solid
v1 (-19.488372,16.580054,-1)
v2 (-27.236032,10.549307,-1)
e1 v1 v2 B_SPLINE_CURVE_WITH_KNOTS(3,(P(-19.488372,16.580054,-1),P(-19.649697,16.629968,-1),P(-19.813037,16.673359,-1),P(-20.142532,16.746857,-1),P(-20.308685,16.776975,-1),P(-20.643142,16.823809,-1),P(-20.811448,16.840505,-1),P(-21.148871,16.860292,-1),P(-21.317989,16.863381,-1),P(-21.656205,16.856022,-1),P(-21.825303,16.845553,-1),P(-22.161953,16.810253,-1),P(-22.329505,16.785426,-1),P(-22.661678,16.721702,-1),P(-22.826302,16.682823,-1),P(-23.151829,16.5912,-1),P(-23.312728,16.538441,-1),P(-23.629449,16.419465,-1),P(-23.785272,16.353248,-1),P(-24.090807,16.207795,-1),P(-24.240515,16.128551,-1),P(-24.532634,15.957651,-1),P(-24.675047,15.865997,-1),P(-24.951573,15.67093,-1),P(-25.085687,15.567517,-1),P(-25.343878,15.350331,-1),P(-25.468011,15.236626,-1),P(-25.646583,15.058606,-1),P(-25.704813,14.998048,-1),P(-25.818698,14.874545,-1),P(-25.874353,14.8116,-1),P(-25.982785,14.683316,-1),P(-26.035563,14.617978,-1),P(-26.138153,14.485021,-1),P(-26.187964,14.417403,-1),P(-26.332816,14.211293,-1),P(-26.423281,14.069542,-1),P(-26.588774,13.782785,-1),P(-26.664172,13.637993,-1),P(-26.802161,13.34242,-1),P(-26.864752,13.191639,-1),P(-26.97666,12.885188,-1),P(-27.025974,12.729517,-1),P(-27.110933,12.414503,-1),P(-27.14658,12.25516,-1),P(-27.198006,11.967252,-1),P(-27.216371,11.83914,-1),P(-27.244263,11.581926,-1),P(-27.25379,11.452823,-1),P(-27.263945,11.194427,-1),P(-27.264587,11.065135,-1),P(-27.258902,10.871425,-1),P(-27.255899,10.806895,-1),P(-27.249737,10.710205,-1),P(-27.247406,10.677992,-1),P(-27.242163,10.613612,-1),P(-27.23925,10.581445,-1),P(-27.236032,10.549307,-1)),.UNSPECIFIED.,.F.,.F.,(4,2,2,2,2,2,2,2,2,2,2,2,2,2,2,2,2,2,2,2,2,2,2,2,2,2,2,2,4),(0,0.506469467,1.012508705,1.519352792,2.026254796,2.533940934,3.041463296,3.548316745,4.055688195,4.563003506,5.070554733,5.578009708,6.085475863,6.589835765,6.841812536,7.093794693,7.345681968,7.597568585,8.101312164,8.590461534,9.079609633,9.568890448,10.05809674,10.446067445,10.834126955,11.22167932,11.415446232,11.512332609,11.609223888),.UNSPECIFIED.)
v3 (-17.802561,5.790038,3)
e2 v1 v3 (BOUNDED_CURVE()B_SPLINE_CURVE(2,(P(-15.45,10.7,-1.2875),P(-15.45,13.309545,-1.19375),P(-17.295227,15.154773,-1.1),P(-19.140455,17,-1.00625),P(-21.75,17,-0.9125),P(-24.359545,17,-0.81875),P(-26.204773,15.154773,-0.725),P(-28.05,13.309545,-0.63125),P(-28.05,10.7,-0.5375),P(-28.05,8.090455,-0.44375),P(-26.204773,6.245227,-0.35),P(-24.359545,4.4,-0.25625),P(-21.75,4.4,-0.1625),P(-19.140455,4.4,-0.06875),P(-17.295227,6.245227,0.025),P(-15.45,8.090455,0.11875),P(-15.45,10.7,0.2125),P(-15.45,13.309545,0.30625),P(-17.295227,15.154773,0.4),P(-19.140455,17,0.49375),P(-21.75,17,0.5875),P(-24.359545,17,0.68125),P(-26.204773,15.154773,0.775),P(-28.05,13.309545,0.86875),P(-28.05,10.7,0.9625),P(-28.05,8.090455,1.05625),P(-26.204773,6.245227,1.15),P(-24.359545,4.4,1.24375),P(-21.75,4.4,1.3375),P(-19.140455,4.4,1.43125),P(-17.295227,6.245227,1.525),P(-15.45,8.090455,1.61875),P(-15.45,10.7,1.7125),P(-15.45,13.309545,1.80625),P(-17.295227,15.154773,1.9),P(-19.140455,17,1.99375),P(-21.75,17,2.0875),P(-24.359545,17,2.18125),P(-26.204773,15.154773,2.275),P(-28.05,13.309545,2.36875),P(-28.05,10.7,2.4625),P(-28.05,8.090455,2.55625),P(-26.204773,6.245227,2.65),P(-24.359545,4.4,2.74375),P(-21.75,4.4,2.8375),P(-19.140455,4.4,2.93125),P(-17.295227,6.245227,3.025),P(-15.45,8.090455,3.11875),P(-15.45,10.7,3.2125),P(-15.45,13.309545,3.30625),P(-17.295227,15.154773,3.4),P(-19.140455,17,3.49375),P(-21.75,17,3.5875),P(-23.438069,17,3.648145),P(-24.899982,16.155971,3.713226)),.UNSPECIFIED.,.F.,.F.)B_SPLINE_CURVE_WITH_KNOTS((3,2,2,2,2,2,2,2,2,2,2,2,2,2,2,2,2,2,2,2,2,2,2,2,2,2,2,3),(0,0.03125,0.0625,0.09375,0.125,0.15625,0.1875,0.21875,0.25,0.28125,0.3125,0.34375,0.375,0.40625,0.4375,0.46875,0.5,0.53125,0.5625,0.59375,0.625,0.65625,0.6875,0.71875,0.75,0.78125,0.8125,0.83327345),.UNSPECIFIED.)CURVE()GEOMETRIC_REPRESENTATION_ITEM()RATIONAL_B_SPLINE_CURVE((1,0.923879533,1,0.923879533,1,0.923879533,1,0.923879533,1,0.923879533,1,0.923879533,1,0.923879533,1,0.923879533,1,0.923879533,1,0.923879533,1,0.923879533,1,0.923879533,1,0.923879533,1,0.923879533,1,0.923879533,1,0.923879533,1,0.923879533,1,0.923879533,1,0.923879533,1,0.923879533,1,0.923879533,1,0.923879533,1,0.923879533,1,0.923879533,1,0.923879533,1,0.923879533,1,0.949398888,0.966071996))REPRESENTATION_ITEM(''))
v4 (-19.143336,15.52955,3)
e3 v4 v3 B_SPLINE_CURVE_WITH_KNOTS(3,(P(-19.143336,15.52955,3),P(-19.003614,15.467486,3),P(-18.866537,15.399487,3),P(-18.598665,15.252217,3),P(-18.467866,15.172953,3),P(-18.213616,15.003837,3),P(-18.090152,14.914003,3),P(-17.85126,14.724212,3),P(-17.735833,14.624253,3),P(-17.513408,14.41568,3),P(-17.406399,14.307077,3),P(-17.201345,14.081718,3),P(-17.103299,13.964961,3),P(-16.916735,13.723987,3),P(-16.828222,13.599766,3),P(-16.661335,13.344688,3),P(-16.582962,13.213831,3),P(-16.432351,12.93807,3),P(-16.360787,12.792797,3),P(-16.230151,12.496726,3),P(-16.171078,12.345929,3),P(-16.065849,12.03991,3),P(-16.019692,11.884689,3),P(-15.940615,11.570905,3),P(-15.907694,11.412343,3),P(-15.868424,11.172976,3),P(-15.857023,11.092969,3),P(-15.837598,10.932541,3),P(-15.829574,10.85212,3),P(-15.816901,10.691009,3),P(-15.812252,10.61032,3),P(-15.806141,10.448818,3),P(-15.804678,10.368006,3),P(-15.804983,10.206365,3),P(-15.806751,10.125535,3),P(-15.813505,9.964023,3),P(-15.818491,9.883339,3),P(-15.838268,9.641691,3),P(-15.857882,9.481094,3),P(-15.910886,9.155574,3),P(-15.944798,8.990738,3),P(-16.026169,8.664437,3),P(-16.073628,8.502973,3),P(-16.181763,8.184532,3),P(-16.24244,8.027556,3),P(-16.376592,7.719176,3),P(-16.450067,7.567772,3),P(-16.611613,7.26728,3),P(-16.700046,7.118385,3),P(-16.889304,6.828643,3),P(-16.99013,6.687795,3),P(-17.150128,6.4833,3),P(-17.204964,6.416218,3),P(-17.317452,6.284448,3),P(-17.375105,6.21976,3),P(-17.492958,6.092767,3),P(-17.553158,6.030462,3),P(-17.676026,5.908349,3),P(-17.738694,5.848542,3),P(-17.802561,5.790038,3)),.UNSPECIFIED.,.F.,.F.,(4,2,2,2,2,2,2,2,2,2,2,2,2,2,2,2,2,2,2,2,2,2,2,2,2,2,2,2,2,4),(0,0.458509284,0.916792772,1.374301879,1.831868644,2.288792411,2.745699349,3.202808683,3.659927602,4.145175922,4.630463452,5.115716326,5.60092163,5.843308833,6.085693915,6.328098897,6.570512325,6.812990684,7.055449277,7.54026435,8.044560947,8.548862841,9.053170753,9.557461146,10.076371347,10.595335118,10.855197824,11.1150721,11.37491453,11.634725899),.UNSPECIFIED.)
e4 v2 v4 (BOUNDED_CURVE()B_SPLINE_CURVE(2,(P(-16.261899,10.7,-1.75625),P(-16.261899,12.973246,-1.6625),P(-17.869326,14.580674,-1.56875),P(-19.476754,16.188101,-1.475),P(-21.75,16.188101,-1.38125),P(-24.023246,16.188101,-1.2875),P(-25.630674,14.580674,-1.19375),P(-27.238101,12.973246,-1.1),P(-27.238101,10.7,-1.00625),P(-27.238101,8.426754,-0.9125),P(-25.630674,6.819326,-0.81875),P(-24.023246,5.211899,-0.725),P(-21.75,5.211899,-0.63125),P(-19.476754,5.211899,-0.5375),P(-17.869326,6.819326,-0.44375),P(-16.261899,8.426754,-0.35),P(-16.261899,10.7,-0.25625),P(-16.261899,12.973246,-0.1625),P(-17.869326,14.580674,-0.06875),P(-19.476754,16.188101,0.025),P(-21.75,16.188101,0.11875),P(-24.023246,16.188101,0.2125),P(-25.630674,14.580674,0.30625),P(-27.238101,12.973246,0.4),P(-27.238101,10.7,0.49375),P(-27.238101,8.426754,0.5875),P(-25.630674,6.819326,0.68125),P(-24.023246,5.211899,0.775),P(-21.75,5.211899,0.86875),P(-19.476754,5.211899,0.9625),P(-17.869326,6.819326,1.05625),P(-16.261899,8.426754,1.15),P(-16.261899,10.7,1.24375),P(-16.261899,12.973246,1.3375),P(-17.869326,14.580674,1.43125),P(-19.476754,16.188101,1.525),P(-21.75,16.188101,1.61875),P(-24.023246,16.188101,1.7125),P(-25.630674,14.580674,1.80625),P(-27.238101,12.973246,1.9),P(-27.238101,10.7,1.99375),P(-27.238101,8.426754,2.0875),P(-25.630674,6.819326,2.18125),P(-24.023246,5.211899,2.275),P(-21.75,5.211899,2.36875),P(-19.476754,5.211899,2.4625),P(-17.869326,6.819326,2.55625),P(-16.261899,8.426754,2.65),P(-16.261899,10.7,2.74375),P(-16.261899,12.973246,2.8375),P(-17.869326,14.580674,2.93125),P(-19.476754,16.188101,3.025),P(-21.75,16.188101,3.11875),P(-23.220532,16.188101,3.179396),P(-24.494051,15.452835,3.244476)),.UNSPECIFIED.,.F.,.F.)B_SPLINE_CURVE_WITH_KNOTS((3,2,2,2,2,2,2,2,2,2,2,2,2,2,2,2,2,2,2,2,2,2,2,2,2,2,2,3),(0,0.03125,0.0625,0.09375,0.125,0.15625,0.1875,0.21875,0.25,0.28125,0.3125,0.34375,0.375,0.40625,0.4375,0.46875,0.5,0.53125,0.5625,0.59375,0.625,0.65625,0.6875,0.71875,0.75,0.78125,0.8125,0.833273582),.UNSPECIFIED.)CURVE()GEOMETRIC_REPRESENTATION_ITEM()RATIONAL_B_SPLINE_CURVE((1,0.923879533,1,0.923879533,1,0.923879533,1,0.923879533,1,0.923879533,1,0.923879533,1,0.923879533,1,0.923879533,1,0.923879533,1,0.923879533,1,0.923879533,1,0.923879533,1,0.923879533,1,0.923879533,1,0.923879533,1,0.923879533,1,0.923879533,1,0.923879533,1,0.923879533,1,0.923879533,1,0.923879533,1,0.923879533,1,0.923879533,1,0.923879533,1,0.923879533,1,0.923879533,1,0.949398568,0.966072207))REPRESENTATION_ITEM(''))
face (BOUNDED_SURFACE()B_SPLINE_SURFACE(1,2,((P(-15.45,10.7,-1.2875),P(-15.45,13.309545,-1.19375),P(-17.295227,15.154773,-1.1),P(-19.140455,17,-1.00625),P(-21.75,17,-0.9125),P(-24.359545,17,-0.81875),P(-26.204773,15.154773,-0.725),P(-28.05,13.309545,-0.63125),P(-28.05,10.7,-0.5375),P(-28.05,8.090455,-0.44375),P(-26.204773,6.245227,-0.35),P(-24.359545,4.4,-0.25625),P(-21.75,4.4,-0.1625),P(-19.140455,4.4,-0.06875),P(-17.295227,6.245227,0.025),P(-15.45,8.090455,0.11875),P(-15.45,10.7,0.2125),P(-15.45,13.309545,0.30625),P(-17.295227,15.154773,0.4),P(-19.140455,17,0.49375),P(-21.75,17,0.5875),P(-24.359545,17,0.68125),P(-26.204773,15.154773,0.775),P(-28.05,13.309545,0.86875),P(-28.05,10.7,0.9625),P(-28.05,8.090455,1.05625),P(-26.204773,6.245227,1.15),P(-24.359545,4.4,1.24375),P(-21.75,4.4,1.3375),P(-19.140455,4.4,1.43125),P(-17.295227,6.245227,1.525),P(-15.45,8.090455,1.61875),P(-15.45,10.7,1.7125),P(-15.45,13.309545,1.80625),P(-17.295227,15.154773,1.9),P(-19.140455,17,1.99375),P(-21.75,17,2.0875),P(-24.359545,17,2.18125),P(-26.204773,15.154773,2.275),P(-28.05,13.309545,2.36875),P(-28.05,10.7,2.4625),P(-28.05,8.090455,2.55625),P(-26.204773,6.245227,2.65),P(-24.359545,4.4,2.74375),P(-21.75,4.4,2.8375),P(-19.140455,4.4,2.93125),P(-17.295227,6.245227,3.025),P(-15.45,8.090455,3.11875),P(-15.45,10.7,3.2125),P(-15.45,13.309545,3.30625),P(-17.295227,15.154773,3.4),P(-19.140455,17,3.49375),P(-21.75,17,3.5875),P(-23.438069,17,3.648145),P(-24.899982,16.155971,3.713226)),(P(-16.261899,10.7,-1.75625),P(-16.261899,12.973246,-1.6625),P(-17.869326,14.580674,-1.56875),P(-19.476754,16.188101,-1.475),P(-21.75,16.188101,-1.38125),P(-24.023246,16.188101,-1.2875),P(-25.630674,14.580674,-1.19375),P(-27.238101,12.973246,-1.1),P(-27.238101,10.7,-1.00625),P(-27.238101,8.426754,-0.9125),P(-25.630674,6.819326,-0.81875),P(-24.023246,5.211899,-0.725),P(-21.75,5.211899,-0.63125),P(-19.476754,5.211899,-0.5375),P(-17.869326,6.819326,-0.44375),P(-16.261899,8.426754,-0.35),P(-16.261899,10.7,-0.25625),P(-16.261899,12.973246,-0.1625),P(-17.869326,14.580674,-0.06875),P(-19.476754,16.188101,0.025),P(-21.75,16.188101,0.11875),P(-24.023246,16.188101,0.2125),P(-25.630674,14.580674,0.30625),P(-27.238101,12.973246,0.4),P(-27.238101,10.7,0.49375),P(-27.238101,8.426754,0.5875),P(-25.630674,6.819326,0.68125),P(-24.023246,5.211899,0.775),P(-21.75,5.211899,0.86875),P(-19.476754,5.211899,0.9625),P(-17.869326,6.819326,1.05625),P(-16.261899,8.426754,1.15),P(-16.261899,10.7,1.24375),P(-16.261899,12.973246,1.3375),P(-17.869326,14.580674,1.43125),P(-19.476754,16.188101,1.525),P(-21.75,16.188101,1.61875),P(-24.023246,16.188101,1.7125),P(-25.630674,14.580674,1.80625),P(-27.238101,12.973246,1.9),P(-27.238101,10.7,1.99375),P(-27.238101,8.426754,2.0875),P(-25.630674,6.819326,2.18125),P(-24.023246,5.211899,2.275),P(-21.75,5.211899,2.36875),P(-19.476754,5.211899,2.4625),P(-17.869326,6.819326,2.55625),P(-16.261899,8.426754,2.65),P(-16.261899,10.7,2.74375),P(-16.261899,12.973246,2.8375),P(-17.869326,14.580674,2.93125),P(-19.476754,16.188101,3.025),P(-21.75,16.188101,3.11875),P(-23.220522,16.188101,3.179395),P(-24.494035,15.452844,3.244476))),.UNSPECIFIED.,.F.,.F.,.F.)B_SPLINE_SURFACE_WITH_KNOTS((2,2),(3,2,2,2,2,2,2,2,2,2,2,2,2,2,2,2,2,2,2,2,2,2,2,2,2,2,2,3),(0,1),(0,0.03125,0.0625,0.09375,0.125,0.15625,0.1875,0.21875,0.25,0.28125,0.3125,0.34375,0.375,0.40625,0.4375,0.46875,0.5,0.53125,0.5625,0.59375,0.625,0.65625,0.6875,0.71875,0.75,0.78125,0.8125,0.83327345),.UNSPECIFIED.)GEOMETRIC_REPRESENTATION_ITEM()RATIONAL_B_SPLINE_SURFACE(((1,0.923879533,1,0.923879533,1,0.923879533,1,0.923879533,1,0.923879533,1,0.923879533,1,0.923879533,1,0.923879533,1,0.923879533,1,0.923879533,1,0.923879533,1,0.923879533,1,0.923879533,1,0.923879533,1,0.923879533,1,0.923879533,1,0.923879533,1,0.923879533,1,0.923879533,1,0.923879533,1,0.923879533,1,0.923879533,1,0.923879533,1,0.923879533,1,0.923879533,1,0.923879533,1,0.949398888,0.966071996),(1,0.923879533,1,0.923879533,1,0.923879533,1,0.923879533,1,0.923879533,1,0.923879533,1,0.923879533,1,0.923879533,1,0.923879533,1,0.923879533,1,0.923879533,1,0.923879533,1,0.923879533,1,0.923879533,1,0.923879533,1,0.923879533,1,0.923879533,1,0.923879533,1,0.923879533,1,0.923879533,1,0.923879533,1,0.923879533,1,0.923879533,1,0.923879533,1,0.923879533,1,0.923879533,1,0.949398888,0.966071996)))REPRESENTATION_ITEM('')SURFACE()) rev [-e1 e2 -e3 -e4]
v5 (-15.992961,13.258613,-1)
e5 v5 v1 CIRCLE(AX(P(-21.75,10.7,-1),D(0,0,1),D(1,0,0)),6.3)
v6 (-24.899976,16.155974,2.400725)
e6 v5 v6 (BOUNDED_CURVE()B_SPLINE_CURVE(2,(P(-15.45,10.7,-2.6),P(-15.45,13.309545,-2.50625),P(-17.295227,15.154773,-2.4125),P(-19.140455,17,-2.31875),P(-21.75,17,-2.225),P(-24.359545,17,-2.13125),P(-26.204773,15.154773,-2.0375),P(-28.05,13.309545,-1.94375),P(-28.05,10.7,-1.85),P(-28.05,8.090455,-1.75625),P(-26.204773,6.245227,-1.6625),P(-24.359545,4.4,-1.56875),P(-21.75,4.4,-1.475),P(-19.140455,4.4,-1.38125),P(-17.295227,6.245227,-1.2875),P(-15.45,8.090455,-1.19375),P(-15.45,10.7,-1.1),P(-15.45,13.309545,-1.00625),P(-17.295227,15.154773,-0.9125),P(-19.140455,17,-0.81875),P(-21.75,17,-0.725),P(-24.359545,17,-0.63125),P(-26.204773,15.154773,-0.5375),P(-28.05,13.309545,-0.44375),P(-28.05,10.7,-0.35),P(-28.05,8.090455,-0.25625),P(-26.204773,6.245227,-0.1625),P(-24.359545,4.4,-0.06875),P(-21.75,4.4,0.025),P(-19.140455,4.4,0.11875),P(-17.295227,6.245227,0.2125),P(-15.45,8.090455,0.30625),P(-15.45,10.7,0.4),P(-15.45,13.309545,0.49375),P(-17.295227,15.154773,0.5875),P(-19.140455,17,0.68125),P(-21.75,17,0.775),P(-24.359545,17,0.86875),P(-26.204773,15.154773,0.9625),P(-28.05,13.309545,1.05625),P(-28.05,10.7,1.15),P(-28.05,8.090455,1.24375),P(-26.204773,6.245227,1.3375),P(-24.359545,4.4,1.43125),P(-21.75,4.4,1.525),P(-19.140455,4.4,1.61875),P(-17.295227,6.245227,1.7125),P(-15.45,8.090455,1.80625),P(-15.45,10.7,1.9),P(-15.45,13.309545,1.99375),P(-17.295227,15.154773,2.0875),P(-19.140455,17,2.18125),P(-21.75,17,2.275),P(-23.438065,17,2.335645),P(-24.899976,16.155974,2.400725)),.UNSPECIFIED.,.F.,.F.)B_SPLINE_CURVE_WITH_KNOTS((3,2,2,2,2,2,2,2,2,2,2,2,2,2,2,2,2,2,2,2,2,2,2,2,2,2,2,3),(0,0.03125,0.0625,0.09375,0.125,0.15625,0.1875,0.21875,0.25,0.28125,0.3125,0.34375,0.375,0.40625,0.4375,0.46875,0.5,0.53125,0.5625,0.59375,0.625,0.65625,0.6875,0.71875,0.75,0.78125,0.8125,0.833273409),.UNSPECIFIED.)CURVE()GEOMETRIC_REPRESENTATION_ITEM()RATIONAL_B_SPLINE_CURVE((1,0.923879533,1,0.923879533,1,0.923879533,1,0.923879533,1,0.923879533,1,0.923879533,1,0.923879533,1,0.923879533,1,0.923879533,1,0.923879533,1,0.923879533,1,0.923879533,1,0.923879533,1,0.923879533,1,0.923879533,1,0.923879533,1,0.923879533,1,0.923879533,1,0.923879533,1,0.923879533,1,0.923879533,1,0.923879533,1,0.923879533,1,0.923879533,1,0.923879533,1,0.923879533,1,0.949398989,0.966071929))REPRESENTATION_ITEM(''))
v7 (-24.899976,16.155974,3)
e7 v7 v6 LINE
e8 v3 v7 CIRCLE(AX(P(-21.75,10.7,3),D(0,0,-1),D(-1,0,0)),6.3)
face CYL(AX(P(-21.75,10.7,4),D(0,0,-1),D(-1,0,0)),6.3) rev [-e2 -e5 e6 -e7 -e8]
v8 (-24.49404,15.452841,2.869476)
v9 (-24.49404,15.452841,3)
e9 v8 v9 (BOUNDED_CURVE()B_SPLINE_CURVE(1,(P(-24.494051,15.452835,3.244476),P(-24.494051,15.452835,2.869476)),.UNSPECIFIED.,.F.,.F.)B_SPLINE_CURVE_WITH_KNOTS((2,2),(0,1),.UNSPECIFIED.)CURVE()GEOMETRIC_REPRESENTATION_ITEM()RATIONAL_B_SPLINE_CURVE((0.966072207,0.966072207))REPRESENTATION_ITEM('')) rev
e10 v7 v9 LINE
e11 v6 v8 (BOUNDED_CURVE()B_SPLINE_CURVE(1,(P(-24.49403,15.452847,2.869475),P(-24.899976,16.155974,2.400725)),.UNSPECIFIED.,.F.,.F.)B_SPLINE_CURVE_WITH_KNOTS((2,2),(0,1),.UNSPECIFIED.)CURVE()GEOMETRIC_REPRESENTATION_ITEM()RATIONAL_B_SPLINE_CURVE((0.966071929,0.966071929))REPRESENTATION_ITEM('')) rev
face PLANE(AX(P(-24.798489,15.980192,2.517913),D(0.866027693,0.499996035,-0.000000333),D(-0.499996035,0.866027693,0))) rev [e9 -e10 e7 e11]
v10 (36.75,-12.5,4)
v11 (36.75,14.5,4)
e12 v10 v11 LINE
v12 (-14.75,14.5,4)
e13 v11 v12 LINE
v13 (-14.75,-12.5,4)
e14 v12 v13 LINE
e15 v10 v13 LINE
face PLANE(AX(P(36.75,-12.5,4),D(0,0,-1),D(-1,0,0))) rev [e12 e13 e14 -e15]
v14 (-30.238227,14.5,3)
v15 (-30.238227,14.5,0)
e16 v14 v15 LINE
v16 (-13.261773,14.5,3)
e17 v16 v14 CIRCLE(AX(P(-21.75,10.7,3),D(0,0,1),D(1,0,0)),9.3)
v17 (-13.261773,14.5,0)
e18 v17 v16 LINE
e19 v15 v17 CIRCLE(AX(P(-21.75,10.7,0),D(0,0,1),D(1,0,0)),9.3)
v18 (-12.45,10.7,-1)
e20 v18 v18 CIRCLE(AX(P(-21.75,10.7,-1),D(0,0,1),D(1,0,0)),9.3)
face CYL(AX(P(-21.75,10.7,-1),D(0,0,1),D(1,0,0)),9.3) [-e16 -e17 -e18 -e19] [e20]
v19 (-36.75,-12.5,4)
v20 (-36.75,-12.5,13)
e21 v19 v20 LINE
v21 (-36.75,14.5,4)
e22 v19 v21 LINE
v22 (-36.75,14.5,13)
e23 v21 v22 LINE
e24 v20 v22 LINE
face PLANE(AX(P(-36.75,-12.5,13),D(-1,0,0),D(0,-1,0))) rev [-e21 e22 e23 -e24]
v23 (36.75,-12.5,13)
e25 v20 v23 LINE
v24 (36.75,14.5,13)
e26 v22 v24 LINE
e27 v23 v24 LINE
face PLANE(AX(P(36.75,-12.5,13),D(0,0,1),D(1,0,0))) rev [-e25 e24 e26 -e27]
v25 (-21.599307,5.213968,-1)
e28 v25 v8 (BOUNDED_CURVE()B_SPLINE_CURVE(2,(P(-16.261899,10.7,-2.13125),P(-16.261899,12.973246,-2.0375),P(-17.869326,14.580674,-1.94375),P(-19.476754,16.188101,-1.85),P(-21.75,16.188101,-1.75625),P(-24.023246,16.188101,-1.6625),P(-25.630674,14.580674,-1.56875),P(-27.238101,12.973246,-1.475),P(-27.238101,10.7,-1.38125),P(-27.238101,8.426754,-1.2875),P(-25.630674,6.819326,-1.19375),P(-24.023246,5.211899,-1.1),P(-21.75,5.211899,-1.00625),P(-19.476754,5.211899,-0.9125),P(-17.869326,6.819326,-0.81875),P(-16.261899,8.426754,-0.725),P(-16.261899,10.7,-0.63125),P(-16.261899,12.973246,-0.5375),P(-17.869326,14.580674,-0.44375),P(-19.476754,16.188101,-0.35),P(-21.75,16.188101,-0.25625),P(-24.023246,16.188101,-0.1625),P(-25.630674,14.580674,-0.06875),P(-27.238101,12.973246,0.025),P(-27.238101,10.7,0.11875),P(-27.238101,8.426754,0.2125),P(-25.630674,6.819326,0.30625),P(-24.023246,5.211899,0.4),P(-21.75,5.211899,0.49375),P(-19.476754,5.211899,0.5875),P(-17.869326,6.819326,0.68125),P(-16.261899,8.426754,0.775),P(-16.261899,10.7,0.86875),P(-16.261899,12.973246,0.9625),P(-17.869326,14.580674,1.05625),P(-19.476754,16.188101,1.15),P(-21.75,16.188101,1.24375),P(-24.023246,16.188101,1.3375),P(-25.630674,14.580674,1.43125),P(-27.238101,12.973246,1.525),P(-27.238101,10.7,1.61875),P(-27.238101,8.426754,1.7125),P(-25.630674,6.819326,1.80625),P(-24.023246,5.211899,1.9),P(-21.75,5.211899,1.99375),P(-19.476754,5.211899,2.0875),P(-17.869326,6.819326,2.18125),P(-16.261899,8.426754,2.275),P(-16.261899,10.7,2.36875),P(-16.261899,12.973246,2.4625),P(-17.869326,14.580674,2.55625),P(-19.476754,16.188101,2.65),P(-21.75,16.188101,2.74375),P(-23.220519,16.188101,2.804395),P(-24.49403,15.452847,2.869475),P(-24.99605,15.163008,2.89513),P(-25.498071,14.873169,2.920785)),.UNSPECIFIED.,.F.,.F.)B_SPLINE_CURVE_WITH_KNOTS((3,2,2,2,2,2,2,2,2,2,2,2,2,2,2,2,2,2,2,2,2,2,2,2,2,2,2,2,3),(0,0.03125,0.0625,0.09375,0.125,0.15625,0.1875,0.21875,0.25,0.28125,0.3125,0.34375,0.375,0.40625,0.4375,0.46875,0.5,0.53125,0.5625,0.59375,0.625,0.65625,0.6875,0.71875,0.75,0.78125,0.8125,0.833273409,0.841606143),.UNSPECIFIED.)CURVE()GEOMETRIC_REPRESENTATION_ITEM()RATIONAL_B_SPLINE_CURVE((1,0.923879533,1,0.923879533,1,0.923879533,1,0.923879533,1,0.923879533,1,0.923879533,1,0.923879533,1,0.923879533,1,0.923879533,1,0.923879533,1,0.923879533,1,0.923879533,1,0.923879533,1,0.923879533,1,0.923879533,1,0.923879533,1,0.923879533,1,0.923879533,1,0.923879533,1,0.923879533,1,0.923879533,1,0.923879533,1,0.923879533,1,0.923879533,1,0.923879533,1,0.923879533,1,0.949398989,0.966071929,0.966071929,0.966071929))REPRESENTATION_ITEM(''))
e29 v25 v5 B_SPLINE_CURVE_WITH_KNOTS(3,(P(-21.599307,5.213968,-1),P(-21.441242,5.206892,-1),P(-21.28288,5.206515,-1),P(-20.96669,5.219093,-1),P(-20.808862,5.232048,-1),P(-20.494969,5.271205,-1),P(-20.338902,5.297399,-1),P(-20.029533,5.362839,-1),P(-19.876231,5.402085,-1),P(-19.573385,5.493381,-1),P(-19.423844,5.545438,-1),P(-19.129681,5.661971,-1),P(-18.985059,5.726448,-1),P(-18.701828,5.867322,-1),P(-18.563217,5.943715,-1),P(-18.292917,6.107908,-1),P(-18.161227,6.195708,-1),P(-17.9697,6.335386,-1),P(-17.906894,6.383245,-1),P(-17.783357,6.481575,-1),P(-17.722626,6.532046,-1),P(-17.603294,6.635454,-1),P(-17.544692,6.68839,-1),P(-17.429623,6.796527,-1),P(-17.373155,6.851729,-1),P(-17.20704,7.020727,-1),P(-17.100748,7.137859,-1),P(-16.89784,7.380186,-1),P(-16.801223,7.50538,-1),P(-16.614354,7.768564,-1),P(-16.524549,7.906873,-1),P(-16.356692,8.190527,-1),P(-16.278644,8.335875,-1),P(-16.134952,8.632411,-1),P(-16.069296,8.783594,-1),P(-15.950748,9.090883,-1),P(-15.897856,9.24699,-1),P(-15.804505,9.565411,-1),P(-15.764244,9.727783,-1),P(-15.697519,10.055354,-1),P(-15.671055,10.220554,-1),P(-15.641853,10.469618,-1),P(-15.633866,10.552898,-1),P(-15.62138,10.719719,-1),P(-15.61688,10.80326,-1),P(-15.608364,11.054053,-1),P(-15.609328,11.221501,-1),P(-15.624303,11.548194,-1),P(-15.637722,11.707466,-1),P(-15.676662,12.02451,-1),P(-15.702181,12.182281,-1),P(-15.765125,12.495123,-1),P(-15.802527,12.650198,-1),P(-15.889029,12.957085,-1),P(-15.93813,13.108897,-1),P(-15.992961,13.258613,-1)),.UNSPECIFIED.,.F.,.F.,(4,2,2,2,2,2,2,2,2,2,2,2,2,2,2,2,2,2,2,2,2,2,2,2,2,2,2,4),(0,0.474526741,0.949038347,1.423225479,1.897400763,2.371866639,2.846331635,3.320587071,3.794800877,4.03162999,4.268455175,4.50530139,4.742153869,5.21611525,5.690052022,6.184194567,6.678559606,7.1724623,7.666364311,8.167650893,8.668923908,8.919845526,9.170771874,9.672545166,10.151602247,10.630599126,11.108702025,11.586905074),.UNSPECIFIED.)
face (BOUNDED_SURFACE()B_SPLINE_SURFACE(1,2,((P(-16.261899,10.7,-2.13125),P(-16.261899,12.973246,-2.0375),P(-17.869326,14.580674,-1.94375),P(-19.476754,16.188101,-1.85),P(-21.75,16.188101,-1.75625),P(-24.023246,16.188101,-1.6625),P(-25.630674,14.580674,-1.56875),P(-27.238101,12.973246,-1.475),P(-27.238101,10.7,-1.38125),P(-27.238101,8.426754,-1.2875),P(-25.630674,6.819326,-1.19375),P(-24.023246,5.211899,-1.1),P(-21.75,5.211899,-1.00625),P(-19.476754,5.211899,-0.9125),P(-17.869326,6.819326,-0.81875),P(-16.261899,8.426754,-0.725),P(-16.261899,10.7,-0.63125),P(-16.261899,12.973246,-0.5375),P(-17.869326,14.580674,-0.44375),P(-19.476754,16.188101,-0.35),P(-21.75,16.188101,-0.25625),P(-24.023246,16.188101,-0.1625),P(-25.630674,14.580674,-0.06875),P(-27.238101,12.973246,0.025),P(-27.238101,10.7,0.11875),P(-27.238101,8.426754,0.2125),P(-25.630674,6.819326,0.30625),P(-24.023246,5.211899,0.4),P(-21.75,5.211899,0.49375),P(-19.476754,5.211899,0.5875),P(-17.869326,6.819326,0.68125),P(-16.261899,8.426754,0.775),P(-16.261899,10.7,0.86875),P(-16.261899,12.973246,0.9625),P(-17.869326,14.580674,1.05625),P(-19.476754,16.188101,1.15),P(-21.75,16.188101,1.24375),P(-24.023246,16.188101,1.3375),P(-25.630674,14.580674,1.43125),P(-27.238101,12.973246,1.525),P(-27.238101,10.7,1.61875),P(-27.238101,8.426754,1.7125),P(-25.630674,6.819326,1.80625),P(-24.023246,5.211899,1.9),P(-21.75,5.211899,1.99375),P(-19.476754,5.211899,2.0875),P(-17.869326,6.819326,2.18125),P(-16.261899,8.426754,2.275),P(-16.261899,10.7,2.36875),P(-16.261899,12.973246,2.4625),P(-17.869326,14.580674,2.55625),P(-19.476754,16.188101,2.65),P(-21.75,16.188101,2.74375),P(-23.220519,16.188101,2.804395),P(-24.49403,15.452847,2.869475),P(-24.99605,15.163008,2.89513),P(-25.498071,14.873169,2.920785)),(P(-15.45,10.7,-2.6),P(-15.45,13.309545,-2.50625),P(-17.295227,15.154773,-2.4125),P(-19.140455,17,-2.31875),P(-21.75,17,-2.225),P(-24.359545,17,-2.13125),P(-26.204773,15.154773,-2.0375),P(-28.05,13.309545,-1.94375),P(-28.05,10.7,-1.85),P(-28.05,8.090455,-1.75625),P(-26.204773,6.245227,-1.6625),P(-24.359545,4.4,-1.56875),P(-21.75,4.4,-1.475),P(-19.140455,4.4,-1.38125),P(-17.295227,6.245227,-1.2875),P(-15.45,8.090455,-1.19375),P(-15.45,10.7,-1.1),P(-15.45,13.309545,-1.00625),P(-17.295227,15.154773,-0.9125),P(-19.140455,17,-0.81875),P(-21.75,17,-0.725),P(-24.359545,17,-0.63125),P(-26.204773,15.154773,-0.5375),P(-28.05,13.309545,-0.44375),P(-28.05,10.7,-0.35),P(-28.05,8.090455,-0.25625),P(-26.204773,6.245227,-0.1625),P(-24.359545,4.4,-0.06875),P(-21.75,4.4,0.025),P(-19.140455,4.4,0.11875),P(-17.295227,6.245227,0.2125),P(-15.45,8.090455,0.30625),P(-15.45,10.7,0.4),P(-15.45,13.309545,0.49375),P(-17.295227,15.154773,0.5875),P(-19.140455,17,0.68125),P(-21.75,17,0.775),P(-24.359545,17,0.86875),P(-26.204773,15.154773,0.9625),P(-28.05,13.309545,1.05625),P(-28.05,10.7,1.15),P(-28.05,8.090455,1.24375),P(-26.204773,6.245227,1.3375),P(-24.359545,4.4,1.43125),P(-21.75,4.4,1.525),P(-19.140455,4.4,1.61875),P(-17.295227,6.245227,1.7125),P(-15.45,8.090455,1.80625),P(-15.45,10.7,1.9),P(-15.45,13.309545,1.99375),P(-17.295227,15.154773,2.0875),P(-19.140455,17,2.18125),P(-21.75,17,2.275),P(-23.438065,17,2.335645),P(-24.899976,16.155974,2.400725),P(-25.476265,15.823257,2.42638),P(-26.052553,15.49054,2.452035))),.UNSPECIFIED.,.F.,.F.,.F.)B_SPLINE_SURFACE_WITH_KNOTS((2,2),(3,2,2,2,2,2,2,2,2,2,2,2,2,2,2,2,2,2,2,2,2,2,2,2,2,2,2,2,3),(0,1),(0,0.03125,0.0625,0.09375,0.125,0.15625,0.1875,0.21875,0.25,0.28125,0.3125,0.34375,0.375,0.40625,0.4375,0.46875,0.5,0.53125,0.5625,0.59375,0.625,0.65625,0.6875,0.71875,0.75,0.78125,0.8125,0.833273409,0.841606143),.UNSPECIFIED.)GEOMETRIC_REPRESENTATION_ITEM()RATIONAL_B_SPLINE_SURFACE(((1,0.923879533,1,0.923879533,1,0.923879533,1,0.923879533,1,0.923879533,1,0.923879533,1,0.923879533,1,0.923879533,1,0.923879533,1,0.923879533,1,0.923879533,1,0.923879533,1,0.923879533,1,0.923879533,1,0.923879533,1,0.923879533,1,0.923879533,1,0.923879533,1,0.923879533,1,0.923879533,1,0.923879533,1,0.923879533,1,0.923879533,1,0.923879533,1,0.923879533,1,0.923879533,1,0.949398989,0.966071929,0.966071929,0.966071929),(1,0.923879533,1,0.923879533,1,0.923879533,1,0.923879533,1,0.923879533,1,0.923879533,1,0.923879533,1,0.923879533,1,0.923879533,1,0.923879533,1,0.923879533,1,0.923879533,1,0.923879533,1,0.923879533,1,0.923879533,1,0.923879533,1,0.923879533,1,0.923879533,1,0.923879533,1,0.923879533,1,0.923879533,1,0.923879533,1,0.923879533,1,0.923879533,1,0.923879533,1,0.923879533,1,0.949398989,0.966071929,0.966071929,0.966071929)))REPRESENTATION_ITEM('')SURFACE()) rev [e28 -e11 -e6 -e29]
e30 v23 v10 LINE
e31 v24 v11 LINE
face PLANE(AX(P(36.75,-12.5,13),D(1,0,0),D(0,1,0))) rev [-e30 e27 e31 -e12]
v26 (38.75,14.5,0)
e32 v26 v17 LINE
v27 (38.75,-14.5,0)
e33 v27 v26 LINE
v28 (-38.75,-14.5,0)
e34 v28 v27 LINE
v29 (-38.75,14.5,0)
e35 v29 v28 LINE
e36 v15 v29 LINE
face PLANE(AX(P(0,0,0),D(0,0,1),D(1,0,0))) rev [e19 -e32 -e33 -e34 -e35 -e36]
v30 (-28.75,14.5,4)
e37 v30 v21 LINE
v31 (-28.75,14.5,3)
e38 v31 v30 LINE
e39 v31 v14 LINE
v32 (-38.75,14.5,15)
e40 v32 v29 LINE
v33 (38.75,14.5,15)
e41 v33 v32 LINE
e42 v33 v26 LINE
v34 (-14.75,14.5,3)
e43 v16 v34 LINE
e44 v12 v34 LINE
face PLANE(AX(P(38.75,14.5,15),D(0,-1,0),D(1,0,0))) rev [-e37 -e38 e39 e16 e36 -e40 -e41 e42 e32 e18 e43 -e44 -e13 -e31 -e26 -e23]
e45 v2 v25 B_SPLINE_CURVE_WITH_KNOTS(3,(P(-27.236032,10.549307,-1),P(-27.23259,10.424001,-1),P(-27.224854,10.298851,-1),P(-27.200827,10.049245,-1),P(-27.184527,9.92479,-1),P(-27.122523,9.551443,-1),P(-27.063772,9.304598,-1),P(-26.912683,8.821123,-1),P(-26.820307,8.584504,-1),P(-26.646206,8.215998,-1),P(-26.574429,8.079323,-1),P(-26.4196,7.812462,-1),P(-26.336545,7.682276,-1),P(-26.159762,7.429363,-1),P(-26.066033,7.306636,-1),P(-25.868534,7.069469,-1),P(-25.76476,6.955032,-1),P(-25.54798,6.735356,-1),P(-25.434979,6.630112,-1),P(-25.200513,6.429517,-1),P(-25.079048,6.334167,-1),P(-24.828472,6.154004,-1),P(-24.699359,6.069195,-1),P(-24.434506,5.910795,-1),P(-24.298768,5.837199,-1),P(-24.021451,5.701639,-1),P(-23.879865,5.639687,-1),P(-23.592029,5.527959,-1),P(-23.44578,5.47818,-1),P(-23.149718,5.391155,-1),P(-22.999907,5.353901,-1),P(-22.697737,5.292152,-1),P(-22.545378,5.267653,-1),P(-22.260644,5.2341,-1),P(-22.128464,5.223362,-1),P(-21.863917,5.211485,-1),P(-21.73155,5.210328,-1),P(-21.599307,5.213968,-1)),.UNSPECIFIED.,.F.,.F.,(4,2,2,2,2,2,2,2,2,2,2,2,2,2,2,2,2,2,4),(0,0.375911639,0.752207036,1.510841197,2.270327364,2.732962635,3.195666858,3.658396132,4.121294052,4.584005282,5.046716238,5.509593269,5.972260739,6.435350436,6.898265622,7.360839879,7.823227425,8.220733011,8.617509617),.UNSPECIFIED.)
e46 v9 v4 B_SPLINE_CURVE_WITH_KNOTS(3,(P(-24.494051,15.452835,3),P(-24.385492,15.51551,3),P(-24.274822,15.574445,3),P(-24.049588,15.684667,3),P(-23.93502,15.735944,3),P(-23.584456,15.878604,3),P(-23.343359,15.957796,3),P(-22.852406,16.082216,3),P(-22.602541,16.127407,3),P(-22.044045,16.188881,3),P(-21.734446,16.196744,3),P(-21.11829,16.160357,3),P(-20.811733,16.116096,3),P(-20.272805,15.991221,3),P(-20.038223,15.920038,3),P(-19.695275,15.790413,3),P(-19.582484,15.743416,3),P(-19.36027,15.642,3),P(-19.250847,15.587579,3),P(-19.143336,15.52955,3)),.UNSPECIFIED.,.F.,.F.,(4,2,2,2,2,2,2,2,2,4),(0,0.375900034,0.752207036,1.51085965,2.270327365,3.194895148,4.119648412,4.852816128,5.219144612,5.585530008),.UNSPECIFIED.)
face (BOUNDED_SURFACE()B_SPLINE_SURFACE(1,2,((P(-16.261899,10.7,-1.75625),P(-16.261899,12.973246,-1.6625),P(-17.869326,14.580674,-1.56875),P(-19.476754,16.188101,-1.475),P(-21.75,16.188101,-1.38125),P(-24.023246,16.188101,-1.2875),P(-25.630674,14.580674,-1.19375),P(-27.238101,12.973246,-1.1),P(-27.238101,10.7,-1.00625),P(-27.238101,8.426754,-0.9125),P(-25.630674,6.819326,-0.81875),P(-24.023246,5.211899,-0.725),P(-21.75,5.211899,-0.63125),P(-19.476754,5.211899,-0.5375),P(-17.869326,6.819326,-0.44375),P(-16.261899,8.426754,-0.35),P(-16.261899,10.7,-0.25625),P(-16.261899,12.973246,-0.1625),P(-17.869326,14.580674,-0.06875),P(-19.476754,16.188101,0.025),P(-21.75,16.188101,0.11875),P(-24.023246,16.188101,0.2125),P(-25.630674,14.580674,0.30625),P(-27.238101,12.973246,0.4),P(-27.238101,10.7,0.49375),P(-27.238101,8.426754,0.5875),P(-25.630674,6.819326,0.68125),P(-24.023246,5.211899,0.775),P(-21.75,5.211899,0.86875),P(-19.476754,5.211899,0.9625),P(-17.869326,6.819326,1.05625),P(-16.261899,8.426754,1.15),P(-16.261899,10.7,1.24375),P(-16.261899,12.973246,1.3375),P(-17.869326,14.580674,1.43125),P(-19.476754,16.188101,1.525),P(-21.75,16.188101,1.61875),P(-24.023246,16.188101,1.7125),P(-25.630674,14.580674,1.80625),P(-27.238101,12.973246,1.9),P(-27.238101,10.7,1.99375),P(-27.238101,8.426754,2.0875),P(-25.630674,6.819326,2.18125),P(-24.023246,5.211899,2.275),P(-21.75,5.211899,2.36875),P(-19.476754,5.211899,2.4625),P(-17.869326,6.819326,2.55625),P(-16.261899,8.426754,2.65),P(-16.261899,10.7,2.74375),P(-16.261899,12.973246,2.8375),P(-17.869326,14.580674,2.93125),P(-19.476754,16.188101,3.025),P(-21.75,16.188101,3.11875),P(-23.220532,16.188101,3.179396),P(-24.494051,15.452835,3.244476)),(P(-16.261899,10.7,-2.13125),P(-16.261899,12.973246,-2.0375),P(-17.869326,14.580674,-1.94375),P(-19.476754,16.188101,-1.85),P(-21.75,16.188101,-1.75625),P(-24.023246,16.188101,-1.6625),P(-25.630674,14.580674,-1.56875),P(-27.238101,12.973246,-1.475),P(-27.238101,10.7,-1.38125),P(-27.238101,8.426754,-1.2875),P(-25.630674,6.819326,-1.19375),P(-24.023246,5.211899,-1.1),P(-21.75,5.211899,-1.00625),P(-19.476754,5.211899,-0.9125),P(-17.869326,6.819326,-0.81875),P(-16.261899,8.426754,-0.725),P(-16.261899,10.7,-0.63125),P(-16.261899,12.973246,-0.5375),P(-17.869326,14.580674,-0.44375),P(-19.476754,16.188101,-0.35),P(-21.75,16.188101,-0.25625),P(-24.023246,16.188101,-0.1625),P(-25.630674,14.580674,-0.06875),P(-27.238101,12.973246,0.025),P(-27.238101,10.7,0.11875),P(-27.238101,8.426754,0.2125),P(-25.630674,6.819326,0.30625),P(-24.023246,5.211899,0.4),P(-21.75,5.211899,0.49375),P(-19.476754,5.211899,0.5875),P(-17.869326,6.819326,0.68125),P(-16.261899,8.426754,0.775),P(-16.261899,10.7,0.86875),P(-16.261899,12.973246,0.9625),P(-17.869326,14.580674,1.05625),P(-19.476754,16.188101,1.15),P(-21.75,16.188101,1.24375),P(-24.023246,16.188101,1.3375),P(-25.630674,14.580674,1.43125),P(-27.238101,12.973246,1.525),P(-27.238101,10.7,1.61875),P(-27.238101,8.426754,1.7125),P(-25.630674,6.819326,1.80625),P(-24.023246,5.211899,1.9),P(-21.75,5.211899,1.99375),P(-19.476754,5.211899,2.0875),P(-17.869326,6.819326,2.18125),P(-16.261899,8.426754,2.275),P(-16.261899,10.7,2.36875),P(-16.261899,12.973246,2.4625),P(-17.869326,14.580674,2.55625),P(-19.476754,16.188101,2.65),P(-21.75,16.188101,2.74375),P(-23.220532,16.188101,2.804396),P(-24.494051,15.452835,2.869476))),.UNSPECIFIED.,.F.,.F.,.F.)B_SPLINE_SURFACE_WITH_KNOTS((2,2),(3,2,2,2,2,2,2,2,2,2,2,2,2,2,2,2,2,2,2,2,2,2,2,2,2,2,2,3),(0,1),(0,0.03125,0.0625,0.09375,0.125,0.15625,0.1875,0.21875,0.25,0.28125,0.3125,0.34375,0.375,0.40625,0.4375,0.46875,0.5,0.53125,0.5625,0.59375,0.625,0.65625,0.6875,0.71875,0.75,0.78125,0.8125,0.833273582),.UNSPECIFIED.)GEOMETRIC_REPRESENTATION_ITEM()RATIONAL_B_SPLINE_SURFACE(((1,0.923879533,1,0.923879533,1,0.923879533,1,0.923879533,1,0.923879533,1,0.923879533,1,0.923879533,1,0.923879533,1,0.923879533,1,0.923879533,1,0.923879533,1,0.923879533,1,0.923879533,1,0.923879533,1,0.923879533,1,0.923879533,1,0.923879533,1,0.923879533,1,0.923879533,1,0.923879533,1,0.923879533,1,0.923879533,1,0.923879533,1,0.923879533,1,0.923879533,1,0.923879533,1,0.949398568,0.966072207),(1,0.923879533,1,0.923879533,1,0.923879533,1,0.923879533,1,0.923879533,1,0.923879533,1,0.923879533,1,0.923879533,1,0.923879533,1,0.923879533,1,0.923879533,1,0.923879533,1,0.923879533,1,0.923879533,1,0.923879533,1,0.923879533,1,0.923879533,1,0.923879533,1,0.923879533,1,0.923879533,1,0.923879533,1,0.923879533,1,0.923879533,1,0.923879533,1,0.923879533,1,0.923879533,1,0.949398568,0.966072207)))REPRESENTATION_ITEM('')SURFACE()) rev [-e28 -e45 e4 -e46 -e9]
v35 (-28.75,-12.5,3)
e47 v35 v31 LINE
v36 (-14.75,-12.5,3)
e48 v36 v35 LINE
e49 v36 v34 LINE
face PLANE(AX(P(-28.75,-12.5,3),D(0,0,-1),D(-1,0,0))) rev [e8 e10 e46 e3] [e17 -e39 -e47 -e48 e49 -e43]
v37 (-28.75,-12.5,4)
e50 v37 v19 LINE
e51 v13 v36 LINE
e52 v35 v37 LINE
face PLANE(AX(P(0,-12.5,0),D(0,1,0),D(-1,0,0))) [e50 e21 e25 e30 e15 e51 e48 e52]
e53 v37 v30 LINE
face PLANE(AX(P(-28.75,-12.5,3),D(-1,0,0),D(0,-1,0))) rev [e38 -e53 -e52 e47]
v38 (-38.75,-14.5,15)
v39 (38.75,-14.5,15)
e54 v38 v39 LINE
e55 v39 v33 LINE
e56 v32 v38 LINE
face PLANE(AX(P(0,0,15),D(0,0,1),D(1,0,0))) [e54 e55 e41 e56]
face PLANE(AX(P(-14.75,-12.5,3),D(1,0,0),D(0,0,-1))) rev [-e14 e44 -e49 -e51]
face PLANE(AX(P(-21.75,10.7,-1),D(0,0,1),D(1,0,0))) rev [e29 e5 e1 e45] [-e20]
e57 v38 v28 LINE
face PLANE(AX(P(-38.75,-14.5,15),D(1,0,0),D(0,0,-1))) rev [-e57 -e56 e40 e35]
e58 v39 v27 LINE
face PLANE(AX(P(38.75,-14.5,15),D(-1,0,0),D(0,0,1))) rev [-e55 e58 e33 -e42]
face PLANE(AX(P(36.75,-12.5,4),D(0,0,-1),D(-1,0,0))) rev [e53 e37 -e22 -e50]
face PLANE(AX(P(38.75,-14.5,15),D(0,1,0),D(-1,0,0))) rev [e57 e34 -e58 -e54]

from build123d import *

# Parameters (mm, degrees)
SKIZZE1_W                            = 77.5
SKIZZE1_H                            = 29
AUFSATZ_LINEAR_AUSTRAGEN1_DEPTH      = 15
SKIZZE2_W                            = 73.5
SKIZZE2_H                            = 9
SCHNITT_LINEAR_AUSTRAGEN2_DEPTH      = 27
SKIZZE3_W                            = 14
SKIZZE3_H                            = 3.775324495
SCHNITT_LINEAR_AUSTRAGEN3_DEPTH      = 27
SKIZZE4_R                            = 9.3
AUFSATZ_LINEAR_AUSTRAGEN2_DEPTH      = 4
SCHNITT_LINEAR_AUSTRAGEN4_DEPTH      = 4
SCHNITT_LINEAR_AUSTRAGEN4_DEPTH_BACK = 4
SKIZZE5_R                            = 6.3
GEWINDE1_PITCH                       = 1.5
SKIZZE8_R                            = 6.762792794
SCHNITT_LINEAR_AUSTRAGEN5_DEPTH      = 3
SKIZZE9_R                            = 8.045184368
SCHNITT_LINEAR_AUSTRAGEN6_DEPTH      = 3


with BuildPart() as part:
    # Skizze1 → Aufsatz-Linear austragen1 (new body)
    with BuildSketch(Plane.XY):
        Rectangle(SKIZZE1_W, SKIZZE1_H)
    extrude(amount=AUFSATZ_LINEAR_AUSTRAGEN1_DEPTH)

    # Skizze2 → Schnitt-Linear austragen2 (cut)
    with BuildSketch(Plane(origin=(0, 14.5, 0), x_dir=(1, 0, 0), z_dir=(0, 1, 0))):
        with Locations((0, -8.5)):
            Rectangle(SKIZZE2_W, SKIZZE2_H)
    extrude(amount=-SCHNITT_LINEAR_AUSTRAGEN2_DEPTH, mode=Mode.SUBTRACT)

    # Skizze3 → Schnitt-Linear austragen3 (cut)
    with BuildSketch(Plane(origin=(0, 14.5, 0), x_dir=(1, 0, 0), z_dir=(0, 1, 0))):
        with Locations((-21.75, -4.887662247)):
            Rectangle(SKIZZE3_W, SKIZZE3_H)
    extrude(amount=-SCHNITT_LINEAR_AUSTRAGEN3_DEPTH, mode=Mode.SUBTRACT)

    # Skizze4 → Aufsatz-Linear austragen2 (add)
    with BuildSketch(Plane.XY.offset(3)):
        with Locations((-21.75, 10.7)):
            Circle(SKIZZE4_R)
    extrude(amount=-AUFSATZ_LINEAR_AUSTRAGEN2_DEPTH)

    # Skizze5 → Schnitt-Linear austragen4 (cut, two sides: drawn at the far end of the back side and taken through both)
    with BuildSketch(Plane(origin=(0, 0, 0), x_dir=(-1, 0, 0), z_dir=(0, 0, -1)).offset(-SCHNITT_LINEAR_AUSTRAGEN4_DEPTH_BACK)):
        with Locations((21.75, 10.7)):
            Circle(SKIZZE5_R)
    extrude(amount=SCHNITT_LINEAR_AUSTRAGEN4_DEPTH + SCHNITT_LINEAR_AUSTRAGEN4_DEPTH_BACK, mode=Mode.SUBTRACT)

    # Gewinde1: the profile of Gewindeprofil1 profile screwed along a right-hand helix of 3.333333 turns, 8 arcs to a turn; built about Z, then put on its axis
    gewinde1_z = Axis((0, 0, 0), (0, 0, 1))
    gewinde1_corners = [(6.3003, 0, -0.000173205), (6.3003, 0, 1.312673201), (5.488101188, 0, 0.843749998), (5.488101188, 0, 0.468749998)]
    with BuildLine(mode=Mode.PRIVATE) as gewinde1_profile:
        Line(gewinde1_corners[0], gewinde1_corners[1])
        Line(gewinde1_corners[1], gewinde1_corners[2])
        Line(gewinde1_corners[2], gewinde1_corners[3])
        Line(gewinde1_corners[3], gewinde1_corners[0])
    gewinde1_cap = Face(gewinde1_profile.wire())
    gewinde1_turn_angles = [0, 22.5, 45, 67.5, 90, 112.5, 135, 157.5, 180, 202.5, 225, 247.5, 270, 292.5, 315, 337.5, 360]
    gewinde1_turn_weights = [1, 0.9238795325112867, 1, 0.9238795325112867, 1, 0.9238795325112867, 1, 0.9238795325112867, 1, 0.9238795325112867, 1, 0.9238795325112867, 1, 0.9238795325112867, 1, 0.9238795325112867, 1]
    gewinde1_turn_rails = [Edge.make_bspline([Vector(p[0], p[1], 0).rotate(gewinde1_z, gewinde1_turn_angles[k]) / gewinde1_turn_weights[k] + Vector(0, 0, p[2] + GEWINDE1_PITCH * gewinde1_turn_angles[k] / 360) for k in range(17)], [0, 0, 0, 1, 1, 2, 2, 3, 3, 4, 4, 5, 5, 6, 6, 7, 7, 8, 8, 8], 2, gewinde1_turn_weights) for p in gewinde1_corners]
    gewinde1_turn_sides = [Face.make_surface_from_curves(gewinde1_turn_rails[p[0]], gewinde1_turn_rails[p[1]]) for p in [(0, 1), (1, 2), (2, 3), (3, 0)]]
    gewinde1_last_angles = [1080, 1102.5, 1125, 1147.5, 1170, 1185, 1200]
    gewinde1_last_weights = [1, 0.9238795325112867, 1, 0.9238795325112867, 1, 0.9659258262890688, 1]
    gewinde1_last_rails = [Edge.make_bspline([Vector(p[0], p[1], 0).rotate(gewinde1_z, gewinde1_last_angles[k]) / gewinde1_last_weights[k] + Vector(0, 0, p[2] + GEWINDE1_PITCH * gewinde1_last_angles[k] / 360) for k in range(7)], [0, 0, 0, 1, 1, 2, 2, 3, 3, 3], 2, gewinde1_last_weights) for p in gewinde1_corners]
    gewinde1_last_sides = [Face.make_surface_from_curves(gewinde1_last_rails[p[0]], gewinde1_last_rails[p[1]]) for p in [(0, 1), (1, 2), (2, 3), (3, 0)]]
    gewinde1 = Plane(origin=(-21.75, 10.7, -2.6), x_dir=(1, 0, 0), z_dir=(0, 0, 1)) * Solid(Shell([*[p.moved(Location((0, 0, GEWINDE1_PITCH * i))) for i in range(3) for p in gewinde1_turn_sides], *gewinde1_last_sides, gewinde1_cap, gewinde1_cap.rotate(gewinde1_z, 1200).moved(Location((0, 0, GEWINDE1_PITCH * 1200 / 360)))]))
    add(gewinde1)

    # Skizze8 → Schnitt-Linear austragen5 (cut)
    with BuildSketch(Plane.XY.offset(3)):
        with Locations((-21.75, 10.7)):
            Circle(SKIZZE8_R)
    extrude(amount=SCHNITT_LINEAR_AUSTRAGEN5_DEPTH, mode=Mode.SUBTRACT)

    # Skizze9 → Schnitt-Linear austragen6 (cut)
    with BuildSketch(Plane(origin=(0, 0, -1), x_dir=(-1, 0, 0), z_dir=(0, 0, -1))):
        with Locations((21.75, 10.7)):
            Circle(SKIZZE9_R)
    extrude(amount=SCHNITT_LINEAR_AUSTRAGEN6_DEPTH, mode=Mode.SUBTRACT)


solid = part.part
